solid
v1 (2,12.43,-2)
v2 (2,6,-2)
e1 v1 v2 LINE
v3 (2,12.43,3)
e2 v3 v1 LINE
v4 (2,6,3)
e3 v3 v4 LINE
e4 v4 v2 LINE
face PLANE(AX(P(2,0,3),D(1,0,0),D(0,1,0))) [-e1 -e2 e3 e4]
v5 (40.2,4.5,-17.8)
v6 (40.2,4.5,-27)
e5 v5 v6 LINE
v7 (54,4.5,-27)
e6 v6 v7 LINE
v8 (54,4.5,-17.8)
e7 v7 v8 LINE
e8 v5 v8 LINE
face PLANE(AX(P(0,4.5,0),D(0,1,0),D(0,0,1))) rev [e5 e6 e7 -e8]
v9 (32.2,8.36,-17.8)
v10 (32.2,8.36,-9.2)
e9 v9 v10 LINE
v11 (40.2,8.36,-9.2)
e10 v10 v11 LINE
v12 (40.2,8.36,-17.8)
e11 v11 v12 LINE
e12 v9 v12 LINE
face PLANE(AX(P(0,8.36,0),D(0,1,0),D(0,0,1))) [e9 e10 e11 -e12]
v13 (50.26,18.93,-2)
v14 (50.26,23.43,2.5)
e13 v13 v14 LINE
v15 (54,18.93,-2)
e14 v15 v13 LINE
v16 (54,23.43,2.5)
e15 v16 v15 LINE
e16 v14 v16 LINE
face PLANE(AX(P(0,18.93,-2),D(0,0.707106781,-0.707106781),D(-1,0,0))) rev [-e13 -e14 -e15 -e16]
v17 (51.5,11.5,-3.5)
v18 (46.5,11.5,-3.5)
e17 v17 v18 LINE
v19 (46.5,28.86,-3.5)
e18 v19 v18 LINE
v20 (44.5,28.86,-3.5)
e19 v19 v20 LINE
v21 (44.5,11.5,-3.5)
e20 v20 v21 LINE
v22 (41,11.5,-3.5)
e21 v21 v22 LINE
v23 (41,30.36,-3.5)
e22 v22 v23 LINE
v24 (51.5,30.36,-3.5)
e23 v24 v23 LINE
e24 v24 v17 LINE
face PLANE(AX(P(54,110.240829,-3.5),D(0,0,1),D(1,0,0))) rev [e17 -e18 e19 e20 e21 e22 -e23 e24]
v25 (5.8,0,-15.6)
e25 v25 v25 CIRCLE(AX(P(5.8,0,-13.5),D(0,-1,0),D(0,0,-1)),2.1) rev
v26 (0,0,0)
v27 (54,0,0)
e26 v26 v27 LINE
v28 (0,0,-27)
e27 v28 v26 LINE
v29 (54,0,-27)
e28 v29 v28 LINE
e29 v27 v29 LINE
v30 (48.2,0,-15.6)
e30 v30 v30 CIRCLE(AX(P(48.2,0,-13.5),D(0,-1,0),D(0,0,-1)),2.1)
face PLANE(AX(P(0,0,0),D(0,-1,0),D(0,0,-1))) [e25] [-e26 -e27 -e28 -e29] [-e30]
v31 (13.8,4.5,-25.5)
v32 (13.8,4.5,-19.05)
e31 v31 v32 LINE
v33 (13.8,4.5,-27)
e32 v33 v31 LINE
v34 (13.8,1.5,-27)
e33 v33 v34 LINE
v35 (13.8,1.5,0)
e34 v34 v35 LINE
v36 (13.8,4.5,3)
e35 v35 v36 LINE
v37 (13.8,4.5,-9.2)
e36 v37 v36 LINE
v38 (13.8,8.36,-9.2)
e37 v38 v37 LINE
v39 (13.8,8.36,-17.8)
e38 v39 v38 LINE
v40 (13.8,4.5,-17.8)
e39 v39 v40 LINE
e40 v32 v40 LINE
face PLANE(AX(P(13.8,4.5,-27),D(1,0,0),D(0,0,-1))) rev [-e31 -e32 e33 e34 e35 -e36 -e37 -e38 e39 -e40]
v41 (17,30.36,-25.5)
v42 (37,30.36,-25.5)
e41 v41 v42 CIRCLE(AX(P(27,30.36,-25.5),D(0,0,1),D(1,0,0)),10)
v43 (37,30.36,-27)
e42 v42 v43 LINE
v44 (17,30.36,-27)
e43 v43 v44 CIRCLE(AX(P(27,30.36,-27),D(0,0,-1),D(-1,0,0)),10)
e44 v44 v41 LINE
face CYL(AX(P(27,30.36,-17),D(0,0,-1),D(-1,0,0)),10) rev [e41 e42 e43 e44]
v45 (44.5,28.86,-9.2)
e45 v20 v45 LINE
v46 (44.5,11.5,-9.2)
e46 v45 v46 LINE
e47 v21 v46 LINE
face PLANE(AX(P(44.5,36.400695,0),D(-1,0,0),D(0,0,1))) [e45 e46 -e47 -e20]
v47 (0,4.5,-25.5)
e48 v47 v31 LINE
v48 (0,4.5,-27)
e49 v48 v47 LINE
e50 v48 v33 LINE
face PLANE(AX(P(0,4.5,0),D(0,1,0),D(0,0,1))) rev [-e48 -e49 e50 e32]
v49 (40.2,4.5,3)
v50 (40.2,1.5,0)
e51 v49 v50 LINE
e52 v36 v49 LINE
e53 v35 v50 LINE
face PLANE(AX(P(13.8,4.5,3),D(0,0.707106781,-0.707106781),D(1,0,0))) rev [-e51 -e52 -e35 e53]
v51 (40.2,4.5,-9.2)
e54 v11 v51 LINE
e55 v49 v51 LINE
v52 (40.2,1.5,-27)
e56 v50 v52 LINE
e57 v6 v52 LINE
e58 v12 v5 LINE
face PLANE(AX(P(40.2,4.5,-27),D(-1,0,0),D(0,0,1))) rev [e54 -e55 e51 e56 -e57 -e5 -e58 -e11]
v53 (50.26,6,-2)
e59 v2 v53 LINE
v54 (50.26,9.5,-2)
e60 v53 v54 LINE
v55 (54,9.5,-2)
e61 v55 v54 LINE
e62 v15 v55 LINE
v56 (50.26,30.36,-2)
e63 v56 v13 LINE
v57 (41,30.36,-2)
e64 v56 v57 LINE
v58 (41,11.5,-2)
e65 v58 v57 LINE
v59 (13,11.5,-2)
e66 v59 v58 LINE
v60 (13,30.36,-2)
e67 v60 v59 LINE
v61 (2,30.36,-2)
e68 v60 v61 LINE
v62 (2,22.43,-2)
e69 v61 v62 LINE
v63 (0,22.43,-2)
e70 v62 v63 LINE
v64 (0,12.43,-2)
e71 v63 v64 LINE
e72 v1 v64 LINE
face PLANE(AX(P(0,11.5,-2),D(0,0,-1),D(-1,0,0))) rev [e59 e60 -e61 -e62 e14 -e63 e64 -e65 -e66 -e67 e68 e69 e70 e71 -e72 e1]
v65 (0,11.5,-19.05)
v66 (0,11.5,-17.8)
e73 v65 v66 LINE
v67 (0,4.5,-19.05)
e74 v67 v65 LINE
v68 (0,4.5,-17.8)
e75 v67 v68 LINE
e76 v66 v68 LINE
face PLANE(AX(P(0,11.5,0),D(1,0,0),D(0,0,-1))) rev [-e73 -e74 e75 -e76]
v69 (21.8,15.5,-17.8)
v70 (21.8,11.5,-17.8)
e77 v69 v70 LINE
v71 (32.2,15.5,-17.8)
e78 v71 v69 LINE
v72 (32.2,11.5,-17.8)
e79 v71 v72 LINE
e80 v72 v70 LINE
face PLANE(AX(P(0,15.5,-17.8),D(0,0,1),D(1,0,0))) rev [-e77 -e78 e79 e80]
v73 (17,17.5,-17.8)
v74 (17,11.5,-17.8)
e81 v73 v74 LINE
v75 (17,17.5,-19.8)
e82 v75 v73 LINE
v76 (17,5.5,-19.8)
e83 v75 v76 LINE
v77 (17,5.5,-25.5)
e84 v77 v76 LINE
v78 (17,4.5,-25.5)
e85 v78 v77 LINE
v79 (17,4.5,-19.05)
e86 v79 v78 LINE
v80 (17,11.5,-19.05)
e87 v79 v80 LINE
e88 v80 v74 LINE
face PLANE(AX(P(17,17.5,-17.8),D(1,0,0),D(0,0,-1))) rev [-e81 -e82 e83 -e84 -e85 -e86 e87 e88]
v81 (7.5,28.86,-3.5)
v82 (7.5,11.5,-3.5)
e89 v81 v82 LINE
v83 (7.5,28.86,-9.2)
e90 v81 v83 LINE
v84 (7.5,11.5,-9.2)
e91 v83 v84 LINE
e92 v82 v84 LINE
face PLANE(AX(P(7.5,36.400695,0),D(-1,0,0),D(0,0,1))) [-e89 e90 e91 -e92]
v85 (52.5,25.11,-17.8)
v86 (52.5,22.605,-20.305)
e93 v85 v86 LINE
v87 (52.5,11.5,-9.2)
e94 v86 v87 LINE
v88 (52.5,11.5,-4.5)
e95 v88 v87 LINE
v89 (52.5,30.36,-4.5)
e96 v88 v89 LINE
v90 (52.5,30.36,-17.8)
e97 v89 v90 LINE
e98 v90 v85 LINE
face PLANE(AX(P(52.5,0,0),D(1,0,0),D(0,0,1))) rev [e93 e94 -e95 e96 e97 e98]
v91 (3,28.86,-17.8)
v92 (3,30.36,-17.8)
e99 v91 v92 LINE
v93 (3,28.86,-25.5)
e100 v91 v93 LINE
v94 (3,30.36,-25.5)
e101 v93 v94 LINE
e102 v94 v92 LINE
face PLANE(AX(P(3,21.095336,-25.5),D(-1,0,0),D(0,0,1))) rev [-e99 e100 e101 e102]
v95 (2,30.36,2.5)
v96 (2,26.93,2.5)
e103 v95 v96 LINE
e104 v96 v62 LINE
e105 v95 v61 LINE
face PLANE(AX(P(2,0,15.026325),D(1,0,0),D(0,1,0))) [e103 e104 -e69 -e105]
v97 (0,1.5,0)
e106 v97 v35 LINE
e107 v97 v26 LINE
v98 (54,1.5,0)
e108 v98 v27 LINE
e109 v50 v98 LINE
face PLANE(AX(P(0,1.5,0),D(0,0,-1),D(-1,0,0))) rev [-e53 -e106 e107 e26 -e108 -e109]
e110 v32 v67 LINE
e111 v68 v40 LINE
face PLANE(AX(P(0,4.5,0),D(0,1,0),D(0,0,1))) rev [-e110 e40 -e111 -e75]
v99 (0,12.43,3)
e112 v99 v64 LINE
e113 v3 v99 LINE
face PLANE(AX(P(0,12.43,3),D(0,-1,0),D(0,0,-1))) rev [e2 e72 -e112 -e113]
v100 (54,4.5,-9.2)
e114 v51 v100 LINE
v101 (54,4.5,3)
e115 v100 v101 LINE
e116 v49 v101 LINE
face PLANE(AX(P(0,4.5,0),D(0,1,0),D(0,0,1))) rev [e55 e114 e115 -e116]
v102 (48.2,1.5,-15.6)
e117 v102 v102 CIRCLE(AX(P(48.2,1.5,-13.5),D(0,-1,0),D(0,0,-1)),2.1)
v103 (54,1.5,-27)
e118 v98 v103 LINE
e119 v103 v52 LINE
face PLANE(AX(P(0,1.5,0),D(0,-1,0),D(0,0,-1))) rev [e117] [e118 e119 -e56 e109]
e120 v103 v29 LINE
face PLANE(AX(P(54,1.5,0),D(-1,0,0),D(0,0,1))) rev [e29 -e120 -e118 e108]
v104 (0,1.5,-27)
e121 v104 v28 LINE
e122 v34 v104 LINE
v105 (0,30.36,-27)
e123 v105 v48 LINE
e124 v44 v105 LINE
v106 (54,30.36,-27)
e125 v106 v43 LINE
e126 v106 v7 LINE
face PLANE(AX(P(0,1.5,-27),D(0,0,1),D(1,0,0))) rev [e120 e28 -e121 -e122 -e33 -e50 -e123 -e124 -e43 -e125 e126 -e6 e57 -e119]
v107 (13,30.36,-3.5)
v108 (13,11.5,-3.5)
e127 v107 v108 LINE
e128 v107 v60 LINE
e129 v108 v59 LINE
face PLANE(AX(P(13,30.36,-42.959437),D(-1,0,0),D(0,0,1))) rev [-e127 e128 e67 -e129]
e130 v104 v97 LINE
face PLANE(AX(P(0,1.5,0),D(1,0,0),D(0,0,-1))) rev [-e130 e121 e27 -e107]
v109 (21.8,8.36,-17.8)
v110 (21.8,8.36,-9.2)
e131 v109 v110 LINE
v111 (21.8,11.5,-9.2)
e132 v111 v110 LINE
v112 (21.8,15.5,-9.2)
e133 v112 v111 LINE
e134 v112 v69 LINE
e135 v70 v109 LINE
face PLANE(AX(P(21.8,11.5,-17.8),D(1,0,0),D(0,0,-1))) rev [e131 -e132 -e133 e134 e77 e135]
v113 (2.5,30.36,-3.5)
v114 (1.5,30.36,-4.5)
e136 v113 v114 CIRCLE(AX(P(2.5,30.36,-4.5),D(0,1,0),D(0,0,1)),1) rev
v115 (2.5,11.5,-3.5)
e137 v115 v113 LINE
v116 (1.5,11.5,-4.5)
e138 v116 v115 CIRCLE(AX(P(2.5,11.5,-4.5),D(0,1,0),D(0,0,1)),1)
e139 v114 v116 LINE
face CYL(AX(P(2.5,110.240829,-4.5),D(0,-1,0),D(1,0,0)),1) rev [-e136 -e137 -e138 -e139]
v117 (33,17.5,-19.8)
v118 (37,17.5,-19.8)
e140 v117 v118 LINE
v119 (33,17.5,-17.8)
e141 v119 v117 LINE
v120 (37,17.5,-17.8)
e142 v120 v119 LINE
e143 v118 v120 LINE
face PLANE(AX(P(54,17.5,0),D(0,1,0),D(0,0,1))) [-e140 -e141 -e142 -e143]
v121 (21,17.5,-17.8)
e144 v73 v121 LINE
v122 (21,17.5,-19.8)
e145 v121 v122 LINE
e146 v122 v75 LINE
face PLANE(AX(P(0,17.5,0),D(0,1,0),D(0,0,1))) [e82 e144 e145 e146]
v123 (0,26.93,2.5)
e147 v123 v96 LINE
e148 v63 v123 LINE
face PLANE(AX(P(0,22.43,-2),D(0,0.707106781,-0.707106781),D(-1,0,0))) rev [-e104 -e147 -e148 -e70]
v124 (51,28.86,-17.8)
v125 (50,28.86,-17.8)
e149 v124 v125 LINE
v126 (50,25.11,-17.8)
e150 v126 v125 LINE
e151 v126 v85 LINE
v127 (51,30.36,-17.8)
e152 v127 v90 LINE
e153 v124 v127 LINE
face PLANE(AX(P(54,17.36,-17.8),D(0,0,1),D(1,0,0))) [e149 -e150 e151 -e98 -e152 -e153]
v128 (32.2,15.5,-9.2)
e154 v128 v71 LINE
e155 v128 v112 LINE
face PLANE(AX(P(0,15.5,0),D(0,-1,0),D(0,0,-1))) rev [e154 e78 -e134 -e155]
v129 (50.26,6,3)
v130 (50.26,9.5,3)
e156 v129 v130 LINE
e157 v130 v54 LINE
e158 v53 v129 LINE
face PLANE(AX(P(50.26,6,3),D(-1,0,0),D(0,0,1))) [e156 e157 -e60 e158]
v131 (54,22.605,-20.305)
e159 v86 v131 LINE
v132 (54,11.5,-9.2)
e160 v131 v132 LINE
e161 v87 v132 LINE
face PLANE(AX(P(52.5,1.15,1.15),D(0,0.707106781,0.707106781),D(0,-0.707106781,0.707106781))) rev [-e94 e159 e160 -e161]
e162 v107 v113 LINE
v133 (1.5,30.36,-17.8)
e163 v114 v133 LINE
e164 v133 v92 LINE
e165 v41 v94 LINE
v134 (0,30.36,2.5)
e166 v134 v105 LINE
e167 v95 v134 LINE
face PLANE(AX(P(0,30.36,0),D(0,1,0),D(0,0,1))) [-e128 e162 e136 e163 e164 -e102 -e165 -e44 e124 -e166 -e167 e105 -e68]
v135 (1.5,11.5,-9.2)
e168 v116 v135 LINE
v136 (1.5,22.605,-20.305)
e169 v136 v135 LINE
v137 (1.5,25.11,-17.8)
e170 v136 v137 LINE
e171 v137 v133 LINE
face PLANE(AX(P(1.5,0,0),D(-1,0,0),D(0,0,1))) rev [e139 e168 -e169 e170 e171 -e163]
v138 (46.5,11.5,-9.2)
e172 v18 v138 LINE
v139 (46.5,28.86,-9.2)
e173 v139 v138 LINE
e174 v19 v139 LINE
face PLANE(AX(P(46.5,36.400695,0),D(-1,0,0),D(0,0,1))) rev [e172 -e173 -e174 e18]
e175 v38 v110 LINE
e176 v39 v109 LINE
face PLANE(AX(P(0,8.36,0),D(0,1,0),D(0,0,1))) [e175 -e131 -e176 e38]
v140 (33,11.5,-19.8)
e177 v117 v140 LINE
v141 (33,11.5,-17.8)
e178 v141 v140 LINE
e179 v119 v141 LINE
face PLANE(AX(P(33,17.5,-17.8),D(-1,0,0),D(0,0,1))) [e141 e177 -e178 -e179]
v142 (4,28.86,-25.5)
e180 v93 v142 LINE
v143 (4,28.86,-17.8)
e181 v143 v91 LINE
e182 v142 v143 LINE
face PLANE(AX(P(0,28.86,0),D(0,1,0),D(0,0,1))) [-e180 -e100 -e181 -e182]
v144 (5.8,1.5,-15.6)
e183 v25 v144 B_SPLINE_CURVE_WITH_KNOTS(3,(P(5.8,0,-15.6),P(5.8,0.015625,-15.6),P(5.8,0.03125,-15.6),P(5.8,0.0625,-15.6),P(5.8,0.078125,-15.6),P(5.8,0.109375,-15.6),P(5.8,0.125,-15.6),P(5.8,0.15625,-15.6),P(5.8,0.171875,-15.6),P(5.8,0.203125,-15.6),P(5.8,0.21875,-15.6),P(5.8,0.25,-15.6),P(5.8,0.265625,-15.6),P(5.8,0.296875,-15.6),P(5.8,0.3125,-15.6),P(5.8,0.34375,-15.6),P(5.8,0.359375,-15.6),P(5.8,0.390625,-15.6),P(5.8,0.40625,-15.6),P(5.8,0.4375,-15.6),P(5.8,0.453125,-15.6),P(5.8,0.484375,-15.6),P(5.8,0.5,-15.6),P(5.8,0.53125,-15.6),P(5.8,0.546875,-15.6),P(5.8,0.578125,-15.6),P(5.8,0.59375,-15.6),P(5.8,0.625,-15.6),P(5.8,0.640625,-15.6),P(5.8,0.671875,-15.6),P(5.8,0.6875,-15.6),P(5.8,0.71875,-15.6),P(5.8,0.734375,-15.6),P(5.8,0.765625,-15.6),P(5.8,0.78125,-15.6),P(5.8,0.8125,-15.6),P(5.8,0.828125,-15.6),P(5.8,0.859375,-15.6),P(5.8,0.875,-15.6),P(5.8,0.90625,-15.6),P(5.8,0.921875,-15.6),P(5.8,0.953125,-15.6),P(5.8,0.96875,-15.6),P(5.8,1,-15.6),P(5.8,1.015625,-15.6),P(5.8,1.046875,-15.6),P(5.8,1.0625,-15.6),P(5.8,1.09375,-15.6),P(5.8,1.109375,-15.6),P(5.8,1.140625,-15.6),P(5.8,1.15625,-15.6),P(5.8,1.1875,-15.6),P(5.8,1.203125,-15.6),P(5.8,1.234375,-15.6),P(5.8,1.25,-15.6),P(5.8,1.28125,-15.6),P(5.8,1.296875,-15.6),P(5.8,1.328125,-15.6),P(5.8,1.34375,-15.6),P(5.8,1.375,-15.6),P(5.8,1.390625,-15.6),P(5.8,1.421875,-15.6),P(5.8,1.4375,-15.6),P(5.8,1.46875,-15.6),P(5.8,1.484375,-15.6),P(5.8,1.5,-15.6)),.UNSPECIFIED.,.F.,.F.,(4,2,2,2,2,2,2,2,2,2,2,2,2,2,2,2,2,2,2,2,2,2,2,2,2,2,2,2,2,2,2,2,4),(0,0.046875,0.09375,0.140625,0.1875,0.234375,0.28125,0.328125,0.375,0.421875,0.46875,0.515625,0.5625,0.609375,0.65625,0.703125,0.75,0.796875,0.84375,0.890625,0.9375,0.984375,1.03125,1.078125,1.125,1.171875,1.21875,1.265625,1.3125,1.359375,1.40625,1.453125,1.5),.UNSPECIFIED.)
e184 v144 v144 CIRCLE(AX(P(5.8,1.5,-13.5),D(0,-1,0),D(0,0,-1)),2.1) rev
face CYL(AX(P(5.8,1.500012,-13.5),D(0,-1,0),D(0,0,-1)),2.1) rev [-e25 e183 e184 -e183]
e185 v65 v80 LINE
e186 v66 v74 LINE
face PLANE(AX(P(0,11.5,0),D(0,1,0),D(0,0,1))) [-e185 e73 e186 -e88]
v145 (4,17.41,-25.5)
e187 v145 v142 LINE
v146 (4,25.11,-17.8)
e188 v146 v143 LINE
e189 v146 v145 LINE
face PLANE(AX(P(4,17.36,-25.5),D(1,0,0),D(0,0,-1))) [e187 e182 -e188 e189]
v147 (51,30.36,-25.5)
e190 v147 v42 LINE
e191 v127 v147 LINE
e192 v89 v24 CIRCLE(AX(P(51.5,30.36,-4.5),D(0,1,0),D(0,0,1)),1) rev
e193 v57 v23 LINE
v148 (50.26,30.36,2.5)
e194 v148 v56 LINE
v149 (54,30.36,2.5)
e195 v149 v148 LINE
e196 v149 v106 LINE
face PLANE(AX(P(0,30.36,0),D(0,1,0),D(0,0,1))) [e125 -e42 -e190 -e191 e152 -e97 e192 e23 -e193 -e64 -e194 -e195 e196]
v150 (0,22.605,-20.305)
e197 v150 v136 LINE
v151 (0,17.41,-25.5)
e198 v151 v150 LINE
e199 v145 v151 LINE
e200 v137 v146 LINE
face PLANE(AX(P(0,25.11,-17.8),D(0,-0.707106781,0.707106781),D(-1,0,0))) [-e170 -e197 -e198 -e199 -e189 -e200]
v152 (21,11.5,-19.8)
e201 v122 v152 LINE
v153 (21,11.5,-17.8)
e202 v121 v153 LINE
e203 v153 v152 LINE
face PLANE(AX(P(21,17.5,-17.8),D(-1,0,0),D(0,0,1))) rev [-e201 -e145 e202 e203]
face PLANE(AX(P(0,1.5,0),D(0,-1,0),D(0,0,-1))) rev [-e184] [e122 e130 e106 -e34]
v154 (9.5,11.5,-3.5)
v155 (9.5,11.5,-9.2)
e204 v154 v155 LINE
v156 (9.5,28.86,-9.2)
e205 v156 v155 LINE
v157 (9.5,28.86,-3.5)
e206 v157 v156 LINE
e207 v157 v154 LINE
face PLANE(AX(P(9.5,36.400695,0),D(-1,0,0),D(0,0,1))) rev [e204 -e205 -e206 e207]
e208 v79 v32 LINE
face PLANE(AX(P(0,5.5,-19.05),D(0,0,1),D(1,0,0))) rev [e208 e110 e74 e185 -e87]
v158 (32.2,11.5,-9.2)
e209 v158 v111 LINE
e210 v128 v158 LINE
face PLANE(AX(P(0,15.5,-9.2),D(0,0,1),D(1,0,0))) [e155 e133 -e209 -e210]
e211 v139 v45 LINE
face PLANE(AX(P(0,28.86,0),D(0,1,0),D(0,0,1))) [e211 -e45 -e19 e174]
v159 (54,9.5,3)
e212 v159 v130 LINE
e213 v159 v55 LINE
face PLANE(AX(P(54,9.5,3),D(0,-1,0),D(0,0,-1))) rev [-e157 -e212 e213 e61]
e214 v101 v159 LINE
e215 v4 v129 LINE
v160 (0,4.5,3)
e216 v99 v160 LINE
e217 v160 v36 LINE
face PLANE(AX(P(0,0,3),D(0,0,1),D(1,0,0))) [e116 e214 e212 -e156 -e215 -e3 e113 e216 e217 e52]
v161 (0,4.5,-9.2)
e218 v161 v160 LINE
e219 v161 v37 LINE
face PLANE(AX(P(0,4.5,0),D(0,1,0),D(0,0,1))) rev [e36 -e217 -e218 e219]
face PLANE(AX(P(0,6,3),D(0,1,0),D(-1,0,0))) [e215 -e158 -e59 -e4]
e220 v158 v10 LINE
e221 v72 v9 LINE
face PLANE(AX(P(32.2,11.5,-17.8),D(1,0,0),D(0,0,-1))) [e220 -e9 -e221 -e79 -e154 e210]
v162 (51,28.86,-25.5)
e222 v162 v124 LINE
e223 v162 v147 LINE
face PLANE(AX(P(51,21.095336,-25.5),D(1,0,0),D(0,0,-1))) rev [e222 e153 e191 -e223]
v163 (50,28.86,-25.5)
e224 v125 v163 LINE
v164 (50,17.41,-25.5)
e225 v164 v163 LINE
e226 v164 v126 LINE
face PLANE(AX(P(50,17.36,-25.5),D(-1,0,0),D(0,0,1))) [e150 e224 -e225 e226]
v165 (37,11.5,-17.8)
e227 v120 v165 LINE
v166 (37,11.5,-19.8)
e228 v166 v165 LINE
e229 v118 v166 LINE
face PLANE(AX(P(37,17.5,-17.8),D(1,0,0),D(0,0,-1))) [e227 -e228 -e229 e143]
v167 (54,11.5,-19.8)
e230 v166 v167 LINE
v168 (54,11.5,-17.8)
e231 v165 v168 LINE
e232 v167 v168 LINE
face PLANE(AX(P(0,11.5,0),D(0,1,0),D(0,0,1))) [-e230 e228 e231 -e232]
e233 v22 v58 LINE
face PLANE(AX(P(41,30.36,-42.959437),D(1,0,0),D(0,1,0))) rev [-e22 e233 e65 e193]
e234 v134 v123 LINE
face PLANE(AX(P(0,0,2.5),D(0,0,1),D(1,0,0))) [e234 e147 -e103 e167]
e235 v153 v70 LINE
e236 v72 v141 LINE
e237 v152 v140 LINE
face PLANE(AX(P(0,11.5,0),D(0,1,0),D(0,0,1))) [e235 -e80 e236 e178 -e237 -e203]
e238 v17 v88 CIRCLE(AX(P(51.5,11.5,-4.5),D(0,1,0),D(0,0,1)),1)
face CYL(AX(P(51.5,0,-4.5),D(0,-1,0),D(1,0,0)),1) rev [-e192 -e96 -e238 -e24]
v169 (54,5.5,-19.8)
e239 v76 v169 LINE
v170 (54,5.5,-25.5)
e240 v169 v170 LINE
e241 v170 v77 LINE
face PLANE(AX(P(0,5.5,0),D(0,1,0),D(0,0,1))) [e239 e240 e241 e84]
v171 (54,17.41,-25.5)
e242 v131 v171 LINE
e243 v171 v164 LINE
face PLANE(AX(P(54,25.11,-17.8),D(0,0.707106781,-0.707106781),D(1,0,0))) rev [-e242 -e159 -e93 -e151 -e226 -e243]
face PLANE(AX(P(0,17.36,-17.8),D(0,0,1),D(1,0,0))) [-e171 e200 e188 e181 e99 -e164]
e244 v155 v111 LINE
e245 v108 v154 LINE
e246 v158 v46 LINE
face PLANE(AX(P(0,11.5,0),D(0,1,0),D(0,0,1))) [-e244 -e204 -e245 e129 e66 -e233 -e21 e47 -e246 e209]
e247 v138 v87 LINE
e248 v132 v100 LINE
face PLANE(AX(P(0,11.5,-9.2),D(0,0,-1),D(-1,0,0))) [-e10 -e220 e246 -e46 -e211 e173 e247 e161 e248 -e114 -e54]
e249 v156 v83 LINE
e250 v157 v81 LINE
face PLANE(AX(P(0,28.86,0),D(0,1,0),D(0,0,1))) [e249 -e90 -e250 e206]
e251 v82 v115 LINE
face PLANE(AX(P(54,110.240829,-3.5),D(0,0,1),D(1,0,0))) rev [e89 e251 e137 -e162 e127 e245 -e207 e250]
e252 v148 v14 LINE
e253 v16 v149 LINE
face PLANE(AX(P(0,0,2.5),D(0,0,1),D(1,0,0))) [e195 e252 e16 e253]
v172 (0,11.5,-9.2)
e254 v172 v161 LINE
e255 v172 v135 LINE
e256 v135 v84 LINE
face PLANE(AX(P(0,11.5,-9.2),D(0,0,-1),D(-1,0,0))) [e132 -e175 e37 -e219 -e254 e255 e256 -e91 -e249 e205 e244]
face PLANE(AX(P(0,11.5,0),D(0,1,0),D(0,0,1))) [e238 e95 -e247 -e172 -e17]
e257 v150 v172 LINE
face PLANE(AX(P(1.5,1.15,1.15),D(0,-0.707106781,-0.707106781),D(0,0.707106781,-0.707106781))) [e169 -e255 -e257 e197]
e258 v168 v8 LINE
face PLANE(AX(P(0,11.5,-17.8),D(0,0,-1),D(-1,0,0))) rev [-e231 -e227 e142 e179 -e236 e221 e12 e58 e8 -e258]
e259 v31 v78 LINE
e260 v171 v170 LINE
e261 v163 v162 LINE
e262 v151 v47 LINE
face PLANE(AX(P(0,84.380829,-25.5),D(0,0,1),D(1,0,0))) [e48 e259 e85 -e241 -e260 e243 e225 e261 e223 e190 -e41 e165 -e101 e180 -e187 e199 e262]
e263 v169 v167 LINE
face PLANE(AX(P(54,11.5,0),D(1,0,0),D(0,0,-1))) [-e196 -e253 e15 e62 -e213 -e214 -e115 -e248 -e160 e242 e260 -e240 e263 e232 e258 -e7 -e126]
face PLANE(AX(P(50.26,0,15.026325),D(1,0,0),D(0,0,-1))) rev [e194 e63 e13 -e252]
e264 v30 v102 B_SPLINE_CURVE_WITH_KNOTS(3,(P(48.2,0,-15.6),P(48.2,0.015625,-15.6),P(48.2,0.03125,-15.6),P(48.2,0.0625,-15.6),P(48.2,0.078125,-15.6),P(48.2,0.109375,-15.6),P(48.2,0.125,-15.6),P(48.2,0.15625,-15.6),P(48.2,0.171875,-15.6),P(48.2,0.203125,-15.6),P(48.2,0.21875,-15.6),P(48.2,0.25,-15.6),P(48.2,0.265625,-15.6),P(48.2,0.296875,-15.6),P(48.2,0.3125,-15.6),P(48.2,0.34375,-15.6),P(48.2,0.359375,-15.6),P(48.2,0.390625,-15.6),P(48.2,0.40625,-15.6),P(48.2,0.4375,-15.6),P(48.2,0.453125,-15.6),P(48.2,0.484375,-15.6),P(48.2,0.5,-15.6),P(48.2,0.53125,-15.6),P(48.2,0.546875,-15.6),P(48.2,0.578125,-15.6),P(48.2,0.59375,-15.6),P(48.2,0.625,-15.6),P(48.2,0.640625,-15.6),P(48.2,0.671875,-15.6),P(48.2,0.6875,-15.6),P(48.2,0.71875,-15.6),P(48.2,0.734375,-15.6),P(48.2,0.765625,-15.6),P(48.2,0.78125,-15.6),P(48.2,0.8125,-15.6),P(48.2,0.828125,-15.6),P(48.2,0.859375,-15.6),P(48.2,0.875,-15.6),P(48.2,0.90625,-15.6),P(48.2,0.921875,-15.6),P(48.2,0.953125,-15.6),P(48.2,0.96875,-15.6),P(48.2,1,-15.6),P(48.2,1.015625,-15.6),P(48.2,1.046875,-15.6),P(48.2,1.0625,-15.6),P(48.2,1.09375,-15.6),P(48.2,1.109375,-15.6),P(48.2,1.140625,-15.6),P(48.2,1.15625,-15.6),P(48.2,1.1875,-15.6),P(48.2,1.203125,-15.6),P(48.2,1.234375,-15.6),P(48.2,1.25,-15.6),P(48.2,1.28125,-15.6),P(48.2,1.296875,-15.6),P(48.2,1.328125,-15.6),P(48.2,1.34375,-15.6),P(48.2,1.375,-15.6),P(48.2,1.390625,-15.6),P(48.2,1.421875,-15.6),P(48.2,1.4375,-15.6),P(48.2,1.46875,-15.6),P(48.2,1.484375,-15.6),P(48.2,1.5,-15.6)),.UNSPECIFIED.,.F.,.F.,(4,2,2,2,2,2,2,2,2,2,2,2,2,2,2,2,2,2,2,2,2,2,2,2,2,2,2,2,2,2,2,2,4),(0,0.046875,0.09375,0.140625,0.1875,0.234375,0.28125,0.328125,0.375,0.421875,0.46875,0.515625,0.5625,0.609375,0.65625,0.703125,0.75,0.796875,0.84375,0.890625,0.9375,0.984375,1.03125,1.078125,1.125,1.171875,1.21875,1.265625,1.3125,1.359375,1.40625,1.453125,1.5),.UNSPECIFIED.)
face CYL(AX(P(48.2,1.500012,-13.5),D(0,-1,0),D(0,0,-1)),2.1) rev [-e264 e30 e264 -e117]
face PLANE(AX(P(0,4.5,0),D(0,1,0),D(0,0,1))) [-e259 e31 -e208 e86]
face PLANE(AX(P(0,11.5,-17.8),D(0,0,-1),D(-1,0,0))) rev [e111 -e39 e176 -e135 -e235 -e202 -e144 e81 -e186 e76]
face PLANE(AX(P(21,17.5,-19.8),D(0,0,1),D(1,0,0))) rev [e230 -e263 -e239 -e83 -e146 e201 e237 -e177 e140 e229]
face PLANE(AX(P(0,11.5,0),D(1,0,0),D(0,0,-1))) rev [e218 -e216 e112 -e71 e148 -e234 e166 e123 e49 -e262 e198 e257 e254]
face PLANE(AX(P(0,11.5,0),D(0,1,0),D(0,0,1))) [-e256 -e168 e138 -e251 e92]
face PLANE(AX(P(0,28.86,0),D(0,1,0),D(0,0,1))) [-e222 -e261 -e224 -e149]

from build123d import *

# Parameters (mm, degrees)
SKETCH1_W                      = 54
SKETCH1_H                      = 27
BOSS_EXTRUDE1_DEPTH            = 1.5
CUT_EXTRUDE1_REACH             = 62.392
SKETCH2_R                      = 2.1
CUT_EXTRUDE1_DIRECTION_2_DEPTH = 61.392466418
SKETCH3_W                      = 26.4
SKETCH3_H                      = 30
BOSS_EXTRUDE2_DEPTH            = 3
CHAMFER3_SIZE                  = 3
BOSS_EXTRUDE3_DEPTH            = 7
BOSS_EXTRUDE15_START           = 7
SKETCH4_4_W                    = 10.4
SKETCH4_4_H                    = 8.6
BOSS_EXTRUDE15_DEPTH           = 4
SKETCH5_W                      = 54
SKETCH5_H                      = 1.5
BOSS_EXTRUDE5_DEPTH            = 18.86
SKETCH5_3_W                    = 2
SKETCH5_3_H                    = 5.7
BOSS_EXTRUDE6_DEPTH            = 17.36
SKETCH4_3_W                    = 8
SKETCH4_3_H                    = 8.6
BOSS_EXTRUDE12_DEPTH           = 3.86
SKETCH17_W                     = 2
SKETCH17_H                     = 6.43
SKETCH17_W_2                   = 3.74
SKETCH17_H_2                   = 3.5
BOSS_EXTRUDE13_DEPTH           = 5
SKETCH17_3_W                   = 2
SKETCH17_3_H                   = 7.93
SKETCH17_3_W_2                 = 3.74
SKETCH17_3_H_2                 = 11.43
BOSS_EXTRUDE16_DEPTH           = 4.5
CHAMFER7_SIZE                  = 4.5
SKETCH5_4_W                    = 54
SKETCH5_4_H                    = 1.5
BOSS_EXTRUDE8_DEPTH            = 18.86
BOSS_EXTRUDE9_DEPTH            = 1.5
SKETCH18_W                     = 4
SKETCH18_H                     = 7.7
BOSS_EXTRUDE14_DEPTH           = 13
CHAMFER6_SIZE                  = 7.75
SKETCH20_W                     = 1
SKETCH20_H                     = 7.7
CUT_EXTRUDE7_DEPTH             = 1.5
SKETCH12_W                     = 28
SKETCH12_H                     = 18.86
CUT_EXTRUDE2_DEPTH             = 7.2
SKETCH14_R                     = 10
CUT_EXTRUDE3_DEPTH             = 10
SKETCH15_W                     = 4
SKETCH15_H                     = 2
BOSS_EXTRUDE11_DEPTH           = 6
SKETCH21_W                     = 17
SKETCH21_H                     = 5.7
SKETCH21_H_2                   = 0.75
CUT_EXTRUDE8_DEPTH             = 6
CUT_EXTRUDE9_START             = -6
SKETCH21_3_W                   = 17
SKETCH21_3_H                   = 5.7
SKETCH21_3_H_2                 = 0.75
CUT_EXTRUDE9_DEPTH             = 1
FILLET7_R                      = 1


# Some blends are built 0.0001 mm under size
with BuildPart() as part:
    # Sketch1 → Boss-Extrude1 (new body)
    with BuildSketch(Plane(origin=(0, 0, 0), x_dir=(1, 0, 0), z_dir=(0, 1, 0))):
        with Locations((27, 13.5)):
            Rectangle(SKETCH1_W, SKETCH1_H)
    extrude(amount=BOSS_EXTRUDE1_DEPTH)

    # Sketch2 → Cut-Extrude1 (cut, up to next)
    with BuildSketch(Plane(origin=(0, 1.5, 0), x_dir=(1, 0, 0), z_dir=(0, 1, 0)), mode=Mode.PRIVATE) as cut_extrude1_sk1:
        with Locations(Location((5.8, 13.5, 0), (0, 0, 90))):
            Circle(SKETCH2_R)
    cut_extrude1_tool1 = extrude(cut_extrude1_sk1.sketch, amount=-CUT_EXTRUDE1_REACH, mode=Mode.PRIVATE) & part.part
    cut_extrude1 = cut_extrude1_tool1.solids().sort_by_distance((5.8, 1.5, -13.5))[0]
    add(cut_extrude1, mode=Mode.SUBTRACT)

    # Sketch2 → Cut-Extrude1 direction 2 (cut)
    with BuildSketch(Plane(origin=(0, 1.5, 0), x_dir=(1, 0, 0), z_dir=(0, 1, 0))):
        with Locations(Location((5.8, 13.5, 0), (0, 0, 90))):
            Circle(SKETCH2_R)
    cut_extrude1_direction_2 = extrude(amount=CUT_EXTRUDE1_DIRECTION_2_DEPTH, mode=Mode.SUBTRACT)

    # Mirror1: Cut-Extrude1, Cut-Extrude1 direction 2 across plane
    add(cut_extrude1.mirror(Plane.ZY.offset(-27)), mode=Mode.SUBTRACT)
    add(cut_extrude1_direction_2.mirror(Plane.ZY.offset(-27)), mode=Mode.SUBTRACT)

    # Sketch3 → Boss-Extrude2 (add)
    with BuildSketch(Plane(origin=(0, 1.5, 0), x_dir=(1, 0, 0), z_dir=(0, 1, 0))):
        with Locations((27, 12)):
            Rectangle(SKETCH3_W, SKETCH3_H)
    extrude(amount=BOSS_EXTRUDE2_DEPTH)

    # Chamfer3
    chamfer3_edges = [part.edges().sort_by_distance(p)[0] for p in [
        (27, 1.5, 3),
    ]]
    chamfer(chamfer3_edges, length=CHAMFER3_SIZE - 0.0001)  # a hair under: the kernel refuses the full size

    # Sketch4 → Boss-Extrude3 (add)
    with BuildSketch(Plane(origin=(0, 4.5, 0), x_dir=(1, 0, 0), z_dir=(0, 1, 0))):
        Polygon((54, 27), (0, 27), (0, 17.8), (21.8, 17.8), (21.8, 9.2), (0, 9.2), (0, 2), (54, 2), (54, 9.2), (32.2, 9.2), (32.2, 17.8), (54, 17.8), align=None)
    extrude(amount=BOSS_EXTRUDE3_DEPTH)

    # Sketch4<4> → Boss-Extrude15 (add)
    with BuildSketch(Plane(origin=(0, 4.5, 0), x_dir=(1, 0, 0), z_dir=(0, 1, 0)).offset(BOSS_EXTRUDE15_START)):
        with Locations((27, 13.5)):
            Rectangle(SKETCH4_4_W, SKETCH4_4_H)
    extrude(amount=BOSS_EXTRUDE15_DEPTH)

    # Sketch5 → Boss-Extrude5 (add)
    with BuildSketch(Plane(origin=(0, 11.5, 0), x_dir=(1, 0, 0), z_dir=(0, 1, 0))):
        with Locations((27, 2.75)):
            Rectangle(SKETCH5_W, SKETCH5_H)
    extrude(amount=BOSS_EXTRUDE5_DEPTH)

    # Sketch5<3> → Boss-Extrude6 (add)
    with BuildSketch(Plane(origin=(0, 11.5, 0), x_dir=(1, 0, 0), z_dir=(0, 1, 0))):
        with Locations((45.5, 6.35)):
            Rectangle(SKETCH5_3_W, SKETCH5_3_H)
        with Locations((8.5, 6.35)):
            Rectangle(SKETCH5_3_W, SKETCH5_3_H)
    extrude(amount=BOSS_EXTRUDE6_DEPTH)

    # Sketch4<3> → Boss-Extrude12 (add)
    with BuildSketch(Plane(origin=(0, 4.5, 0), x_dir=(1, 0, 0), z_dir=(0, 1, 0))):
        with Locations((17.8, 13.5)):
            Rectangle(SKETCH4_3_W, SKETCH4_3_H)
        with Locations((36.2, 13.5)):
            Rectangle(SKETCH4_3_W, SKETCH4_3_H)
    extrude(amount=BOSS_EXTRUDE12_DEPTH)

    # Sketch17 → Boss-Extrude13 (add)
    with BuildSketch(Plane.XY.offset(-2)):
        with Locations((1, 9.215)):
            Rectangle(SKETCH17_W, SKETCH17_H)
        Polygon((0, 6), (0, 4.5), (13.8, 4.5), (40.2, 4.5), (54, 4.5), (54, 6), (50.26, 6), (2, 6), align=None)
        with Locations((52.13, 7.75)):
            Rectangle(SKETCH17_W_2, SKETCH17_H_2)
    extrude(amount=BOSS_EXTRUDE13_DEPTH)

    # Sketch17<3> → Boss-Extrude16 (add)
    with BuildSketch(Plane.XY.offset(-2)):
        with Locations((1, 26.395)):
            Rectangle(SKETCH17_3_W, SKETCH17_3_H)
        with Locations((52.13, 24.645)):
            Rectangle(SKETCH17_3_W_2, SKETCH17_3_H_2)
    extrude(amount=BOSS_EXTRUDE16_DEPTH)

    # Chamfer7
    chamfer7_edges = [part.edges().sort_by_distance(p)[0] for p in [
        (52.13, 18.93, 2.5),
        (1, 22.43, 2.5),
    ]]
    chamfer(chamfer7_edges, length=CHAMFER7_SIZE - 0.0001)  # a hair under: the kernel refuses the full size

    # Sketch5<4> → Boss-Extrude8 (add)
    with BuildSketch(Plane(origin=(0, 11.5, 0), x_dir=(1, 0, 0), z_dir=(0, 1, 0))):
        with Locations((27, 26.25)):
            Rectangle(SKETCH5_4_W, SKETCH5_4_H)
    extrude(amount=BOSS_EXTRUDE8_DEPTH)

    # Sketch10 → Boss-Extrude9 (add)
    with BuildSketch(Plane.ZY):
        Polygon((-3.5, 11.5), (-3.5, 30.36), (-25.5, 30.36), (-25.5, 27.8), (-9.2, 11.5), align=None)
    boss_extrude9 = extrude(amount=-BOSS_EXTRUDE9_DEPTH)

    # Mirror3: Boss-Extrude9 across plane
    add(boss_extrude9.mirror(Plane.ZY.offset(-27)))

    # Sketch18 → Boss-Extrude14 (add)
    with BuildSketch(Plane(origin=(0, 30.36, 0), x_dir=(1, 0, 0), z_dir=(0, 1, 0))):
        with Locations((2, 21.65)):
            Rectangle(SKETCH18_W, SKETCH18_H)
        with Locations((52, 21.65)):
            Rectangle(SKETCH18_W, SKETCH18_H)
    extrude(amount=-BOSS_EXTRUDE14_DEPTH)

    # Chamfer6
    # the kernel refuses this chamfer: 7.75 mm, written as the material it takes off along each edge
    with BuildSketch(Plane(origin=(23.930543157, 17.36, -17.8), x_dir=(0, -0.027495876610586188, -0.9996219169112968), z_dir=(-1, 0, 0))) as chamfer6_piece_1_section:
        Polygon((CHAMFER6_SIZE * 0.999621916911, -CHAMFER6_SIZE * 0.0274958766106), (-CHAMFER6_SIZE * 0.0274958766106, -CHAMFER6_SIZE * 0.999621916911), (0, 0), align=None)
    chamfer6_piece_1 = extrude(amount=43.861086313, mode=Mode.PRIVATE)
    chamfer6_piece_1 = split(chamfer6_piece_1, bisect_by=Plane(origin=(2.75, 21.192634452, -18.892634452), z_dir=(0, -0.7071067811865515, -0.7071067811865436)), keep=Keep.TOP, mode=Mode.PRIVATE)
    chamfer6_piece_1 = split(chamfer6_piece_1, bisect_by=Plane(origin=(2.75, 19.24037252, -25.5), z_dir=(0, 0, 1)), keep=Keep.TOP, mode=Mode.PRIVATE)
    add(chamfer6_piece_1, mode=Mode.SUBTRACT)
    with BuildSketch(Plane(origin=(23.930543157, 17.36, -17.8), x_dir=(0, -0.027495876610586188, -0.9996219169112968), z_dir=(-1, 0, 0))) as chamfer6_piece_2_section:
        Polygon((CHAMFER6_SIZE * 0.999621916911, -CHAMFER6_SIZE * 0.0274958766106), (-CHAMFER6_SIZE * 0.0274958766106, -CHAMFER6_SIZE * 0.999621916911), (0, 0), align=None)
    chamfer6_piece_2 = extrude(amount=43.861086313, mode=Mode.PRIVATE)
    chamfer6_piece_2 = split(chamfer6_piece_2, bisect_by=Plane(origin=(1.5, 22.605, -18.635), z_dir=(1, 0, 0)), keep=Keep.TOP, mode=Mode.PRIVATE)
    chamfer6_piece_2 = split(chamfer6_piece_2, bisect_by=Plane(origin=(2.75, 22.605, -25.5), z_dir=(0, 0, 1)), keep=Keep.TOP, mode=Mode.PRIVATE)
    add(chamfer6_piece_2, mode=Mode.SUBTRACT)
    with BuildSketch(Plane(origin=(73.930543157, 17.36, -17.8), x_dir=(0, 0.9996219169112968, 0.027495876610586188), z_dir=(-1, 0, 0))) as chamfer6_piece_3_section:
        Polygon((CHAMFER6_SIZE * 0.999621916911, CHAMFER6_SIZE * 0.0274958766106), (-CHAMFER6_SIZE * 0.0274958766106, CHAMFER6_SIZE * 0.999621916911), (0, 0), align=None)
    chamfer6_piece_3 = extrude(amount=43.861086313, mode=Mode.PRIVATE)
    chamfer6_piece_3 = split(chamfer6_piece_3, bisect_by=Plane(origin=(53.25, 21.192634452, -18.892634452), z_dir=(0, -0.7071067811865515, -0.7071067811865436)), keep=Keep.TOP, mode=Mode.PRIVATE)
    chamfer6_piece_3 = split(chamfer6_piece_3, bisect_by=Plane(origin=(53.25, 19.24037252, -25.5), z_dir=(0, 0, 1)), keep=Keep.TOP, mode=Mode.PRIVATE)
    add(chamfer6_piece_3, mode=Mode.SUBTRACT)
    with BuildSketch(Plane(origin=(73.930543157, 17.36, -17.8), x_dir=(0, 0.9996219169112968, 0.027495876610586188), z_dir=(-1, 0, 0))) as chamfer6_piece_4_section:
        Polygon((CHAMFER6_SIZE * 0.999621916911, CHAMFER6_SIZE * 0.0274958766106), (-CHAMFER6_SIZE * 0.0274958766106, CHAMFER6_SIZE * 0.999621916911), (0, 0), align=None)
    chamfer6_piece_4 = extrude(amount=43.861086313, mode=Mode.PRIVATE)
    chamfer6_piece_4 = split(chamfer6_piece_4, bisect_by=Plane(origin=(52.5, 22.605, -18.635), z_dir=(-1, 0, 0)), keep=Keep.TOP, mode=Mode.PRIVATE)
    chamfer6_piece_4 = split(chamfer6_piece_4, bisect_by=Plane(origin=(51.25, 22.605, -25.5), z_dir=(0, 0, 1)), keep=Keep.TOP, mode=Mode.PRIVATE)
    add(chamfer6_piece_4, mode=Mode.SUBTRACT)

    # Sketch20 → Cut-Extrude7 (cut)
    with BuildSketch(Plane(origin=(0, 30.36, 0), x_dir=(1, 0, 0), z_dir=(0, 1, 0))):
        with Locations((3.5, 21.65)):
            Rectangle(SKETCH20_W, SKETCH20_H)
        with Locations((50.5, 21.65)):
            Rectangle(SKETCH20_W, SKETCH20_H)
    extrude(amount=-CUT_EXTRUDE7_DEPTH, mode=Mode.SUBTRACT)

    # Sketch12 → Cut-Extrude2 (cut)
    with BuildSketch(Plane.XY.offset(-2)):
        with Locations((27, 20.93)):
            Rectangle(SKETCH12_W, SKETCH12_H)
    extrude(amount=-CUT_EXTRUDE2_DEPTH, mode=Mode.SUBTRACT)

    # Sketch14 → Cut-Extrude3 (cut)
    with BuildSketch(Plane(origin=(0, 0, -27), x_dir=(-1, 0, 0), z_dir=(0, 0, -1))):
        with Locations((-27, 30.36)):
            Circle(SKETCH14_R)
    extrude(amount=-CUT_EXTRUDE3_DEPTH, mode=Mode.SUBTRACT)

    # Sketch15 → Boss-Extrude11 (add)
    with BuildSketch(Plane(origin=(0, 11.5, 0), x_dir=(1, 0, 0), z_dir=(0, 1, 0))):
        with Locations((19, 18.8)):
            Rectangle(SKETCH15_W, SKETCH15_H)
    boss_extrude11 = extrude(amount=BOSS_EXTRUDE11_DEPTH)

    # Mirror5: Boss-Extrude11 across plane
    add(boss_extrude11.mirror(Plane.ZY.offset(-27)))

    # Sketch21 → Cut-Extrude8 (cut)
    with BuildSketch(Plane(origin=(0, 11.5, 0), x_dir=(1, 0, 0), z_dir=(0, 1, 0))):
        Polygon((54, 25.5), (17, 25.5), (17, 19.8), (21, 19.8), (33, 19.8), (37, 19.8), (54, 19.8), align=None)
        with Locations((8.5, 22.65)):
            Rectangle(SKETCH21_W, SKETCH21_H)
        with Locations((8.5, 19.425)):
            Rectangle(SKETCH21_W, SKETCH21_H_2)
    extrude(amount=-CUT_EXTRUDE8_DEPTH, mode=Mode.SUBTRACT)

    # Sketch21<3> → Cut-Extrude9 (cut)
    with BuildSketch(Plane(origin=(0, 11.5, 0), x_dir=(1, 0, 0), z_dir=(0, 1, 0)).offset(CUT_EXTRUDE9_START)):
        with Locations((8.5, 22.65)):
            Rectangle(SKETCH21_3_W, SKETCH21_3_H)
        with Locations((8.5, 19.425)):
            Rectangle(SKETCH21_3_W, SKETCH21_3_H_2)
    extrude(amount=-CUT_EXTRUDE9_DEPTH, mode=Mode.SUBTRACT)

    # Fillet7
    fillet7_edges = [part.edges().sort_by_distance(p)[0] for p in [
        (1.5, 20.93, -3.5),
        (52.5, 20.93, -3.5),
    ]]
    fillet(fillet7_edges, radius=FILLET7_R)


solid = part.part
